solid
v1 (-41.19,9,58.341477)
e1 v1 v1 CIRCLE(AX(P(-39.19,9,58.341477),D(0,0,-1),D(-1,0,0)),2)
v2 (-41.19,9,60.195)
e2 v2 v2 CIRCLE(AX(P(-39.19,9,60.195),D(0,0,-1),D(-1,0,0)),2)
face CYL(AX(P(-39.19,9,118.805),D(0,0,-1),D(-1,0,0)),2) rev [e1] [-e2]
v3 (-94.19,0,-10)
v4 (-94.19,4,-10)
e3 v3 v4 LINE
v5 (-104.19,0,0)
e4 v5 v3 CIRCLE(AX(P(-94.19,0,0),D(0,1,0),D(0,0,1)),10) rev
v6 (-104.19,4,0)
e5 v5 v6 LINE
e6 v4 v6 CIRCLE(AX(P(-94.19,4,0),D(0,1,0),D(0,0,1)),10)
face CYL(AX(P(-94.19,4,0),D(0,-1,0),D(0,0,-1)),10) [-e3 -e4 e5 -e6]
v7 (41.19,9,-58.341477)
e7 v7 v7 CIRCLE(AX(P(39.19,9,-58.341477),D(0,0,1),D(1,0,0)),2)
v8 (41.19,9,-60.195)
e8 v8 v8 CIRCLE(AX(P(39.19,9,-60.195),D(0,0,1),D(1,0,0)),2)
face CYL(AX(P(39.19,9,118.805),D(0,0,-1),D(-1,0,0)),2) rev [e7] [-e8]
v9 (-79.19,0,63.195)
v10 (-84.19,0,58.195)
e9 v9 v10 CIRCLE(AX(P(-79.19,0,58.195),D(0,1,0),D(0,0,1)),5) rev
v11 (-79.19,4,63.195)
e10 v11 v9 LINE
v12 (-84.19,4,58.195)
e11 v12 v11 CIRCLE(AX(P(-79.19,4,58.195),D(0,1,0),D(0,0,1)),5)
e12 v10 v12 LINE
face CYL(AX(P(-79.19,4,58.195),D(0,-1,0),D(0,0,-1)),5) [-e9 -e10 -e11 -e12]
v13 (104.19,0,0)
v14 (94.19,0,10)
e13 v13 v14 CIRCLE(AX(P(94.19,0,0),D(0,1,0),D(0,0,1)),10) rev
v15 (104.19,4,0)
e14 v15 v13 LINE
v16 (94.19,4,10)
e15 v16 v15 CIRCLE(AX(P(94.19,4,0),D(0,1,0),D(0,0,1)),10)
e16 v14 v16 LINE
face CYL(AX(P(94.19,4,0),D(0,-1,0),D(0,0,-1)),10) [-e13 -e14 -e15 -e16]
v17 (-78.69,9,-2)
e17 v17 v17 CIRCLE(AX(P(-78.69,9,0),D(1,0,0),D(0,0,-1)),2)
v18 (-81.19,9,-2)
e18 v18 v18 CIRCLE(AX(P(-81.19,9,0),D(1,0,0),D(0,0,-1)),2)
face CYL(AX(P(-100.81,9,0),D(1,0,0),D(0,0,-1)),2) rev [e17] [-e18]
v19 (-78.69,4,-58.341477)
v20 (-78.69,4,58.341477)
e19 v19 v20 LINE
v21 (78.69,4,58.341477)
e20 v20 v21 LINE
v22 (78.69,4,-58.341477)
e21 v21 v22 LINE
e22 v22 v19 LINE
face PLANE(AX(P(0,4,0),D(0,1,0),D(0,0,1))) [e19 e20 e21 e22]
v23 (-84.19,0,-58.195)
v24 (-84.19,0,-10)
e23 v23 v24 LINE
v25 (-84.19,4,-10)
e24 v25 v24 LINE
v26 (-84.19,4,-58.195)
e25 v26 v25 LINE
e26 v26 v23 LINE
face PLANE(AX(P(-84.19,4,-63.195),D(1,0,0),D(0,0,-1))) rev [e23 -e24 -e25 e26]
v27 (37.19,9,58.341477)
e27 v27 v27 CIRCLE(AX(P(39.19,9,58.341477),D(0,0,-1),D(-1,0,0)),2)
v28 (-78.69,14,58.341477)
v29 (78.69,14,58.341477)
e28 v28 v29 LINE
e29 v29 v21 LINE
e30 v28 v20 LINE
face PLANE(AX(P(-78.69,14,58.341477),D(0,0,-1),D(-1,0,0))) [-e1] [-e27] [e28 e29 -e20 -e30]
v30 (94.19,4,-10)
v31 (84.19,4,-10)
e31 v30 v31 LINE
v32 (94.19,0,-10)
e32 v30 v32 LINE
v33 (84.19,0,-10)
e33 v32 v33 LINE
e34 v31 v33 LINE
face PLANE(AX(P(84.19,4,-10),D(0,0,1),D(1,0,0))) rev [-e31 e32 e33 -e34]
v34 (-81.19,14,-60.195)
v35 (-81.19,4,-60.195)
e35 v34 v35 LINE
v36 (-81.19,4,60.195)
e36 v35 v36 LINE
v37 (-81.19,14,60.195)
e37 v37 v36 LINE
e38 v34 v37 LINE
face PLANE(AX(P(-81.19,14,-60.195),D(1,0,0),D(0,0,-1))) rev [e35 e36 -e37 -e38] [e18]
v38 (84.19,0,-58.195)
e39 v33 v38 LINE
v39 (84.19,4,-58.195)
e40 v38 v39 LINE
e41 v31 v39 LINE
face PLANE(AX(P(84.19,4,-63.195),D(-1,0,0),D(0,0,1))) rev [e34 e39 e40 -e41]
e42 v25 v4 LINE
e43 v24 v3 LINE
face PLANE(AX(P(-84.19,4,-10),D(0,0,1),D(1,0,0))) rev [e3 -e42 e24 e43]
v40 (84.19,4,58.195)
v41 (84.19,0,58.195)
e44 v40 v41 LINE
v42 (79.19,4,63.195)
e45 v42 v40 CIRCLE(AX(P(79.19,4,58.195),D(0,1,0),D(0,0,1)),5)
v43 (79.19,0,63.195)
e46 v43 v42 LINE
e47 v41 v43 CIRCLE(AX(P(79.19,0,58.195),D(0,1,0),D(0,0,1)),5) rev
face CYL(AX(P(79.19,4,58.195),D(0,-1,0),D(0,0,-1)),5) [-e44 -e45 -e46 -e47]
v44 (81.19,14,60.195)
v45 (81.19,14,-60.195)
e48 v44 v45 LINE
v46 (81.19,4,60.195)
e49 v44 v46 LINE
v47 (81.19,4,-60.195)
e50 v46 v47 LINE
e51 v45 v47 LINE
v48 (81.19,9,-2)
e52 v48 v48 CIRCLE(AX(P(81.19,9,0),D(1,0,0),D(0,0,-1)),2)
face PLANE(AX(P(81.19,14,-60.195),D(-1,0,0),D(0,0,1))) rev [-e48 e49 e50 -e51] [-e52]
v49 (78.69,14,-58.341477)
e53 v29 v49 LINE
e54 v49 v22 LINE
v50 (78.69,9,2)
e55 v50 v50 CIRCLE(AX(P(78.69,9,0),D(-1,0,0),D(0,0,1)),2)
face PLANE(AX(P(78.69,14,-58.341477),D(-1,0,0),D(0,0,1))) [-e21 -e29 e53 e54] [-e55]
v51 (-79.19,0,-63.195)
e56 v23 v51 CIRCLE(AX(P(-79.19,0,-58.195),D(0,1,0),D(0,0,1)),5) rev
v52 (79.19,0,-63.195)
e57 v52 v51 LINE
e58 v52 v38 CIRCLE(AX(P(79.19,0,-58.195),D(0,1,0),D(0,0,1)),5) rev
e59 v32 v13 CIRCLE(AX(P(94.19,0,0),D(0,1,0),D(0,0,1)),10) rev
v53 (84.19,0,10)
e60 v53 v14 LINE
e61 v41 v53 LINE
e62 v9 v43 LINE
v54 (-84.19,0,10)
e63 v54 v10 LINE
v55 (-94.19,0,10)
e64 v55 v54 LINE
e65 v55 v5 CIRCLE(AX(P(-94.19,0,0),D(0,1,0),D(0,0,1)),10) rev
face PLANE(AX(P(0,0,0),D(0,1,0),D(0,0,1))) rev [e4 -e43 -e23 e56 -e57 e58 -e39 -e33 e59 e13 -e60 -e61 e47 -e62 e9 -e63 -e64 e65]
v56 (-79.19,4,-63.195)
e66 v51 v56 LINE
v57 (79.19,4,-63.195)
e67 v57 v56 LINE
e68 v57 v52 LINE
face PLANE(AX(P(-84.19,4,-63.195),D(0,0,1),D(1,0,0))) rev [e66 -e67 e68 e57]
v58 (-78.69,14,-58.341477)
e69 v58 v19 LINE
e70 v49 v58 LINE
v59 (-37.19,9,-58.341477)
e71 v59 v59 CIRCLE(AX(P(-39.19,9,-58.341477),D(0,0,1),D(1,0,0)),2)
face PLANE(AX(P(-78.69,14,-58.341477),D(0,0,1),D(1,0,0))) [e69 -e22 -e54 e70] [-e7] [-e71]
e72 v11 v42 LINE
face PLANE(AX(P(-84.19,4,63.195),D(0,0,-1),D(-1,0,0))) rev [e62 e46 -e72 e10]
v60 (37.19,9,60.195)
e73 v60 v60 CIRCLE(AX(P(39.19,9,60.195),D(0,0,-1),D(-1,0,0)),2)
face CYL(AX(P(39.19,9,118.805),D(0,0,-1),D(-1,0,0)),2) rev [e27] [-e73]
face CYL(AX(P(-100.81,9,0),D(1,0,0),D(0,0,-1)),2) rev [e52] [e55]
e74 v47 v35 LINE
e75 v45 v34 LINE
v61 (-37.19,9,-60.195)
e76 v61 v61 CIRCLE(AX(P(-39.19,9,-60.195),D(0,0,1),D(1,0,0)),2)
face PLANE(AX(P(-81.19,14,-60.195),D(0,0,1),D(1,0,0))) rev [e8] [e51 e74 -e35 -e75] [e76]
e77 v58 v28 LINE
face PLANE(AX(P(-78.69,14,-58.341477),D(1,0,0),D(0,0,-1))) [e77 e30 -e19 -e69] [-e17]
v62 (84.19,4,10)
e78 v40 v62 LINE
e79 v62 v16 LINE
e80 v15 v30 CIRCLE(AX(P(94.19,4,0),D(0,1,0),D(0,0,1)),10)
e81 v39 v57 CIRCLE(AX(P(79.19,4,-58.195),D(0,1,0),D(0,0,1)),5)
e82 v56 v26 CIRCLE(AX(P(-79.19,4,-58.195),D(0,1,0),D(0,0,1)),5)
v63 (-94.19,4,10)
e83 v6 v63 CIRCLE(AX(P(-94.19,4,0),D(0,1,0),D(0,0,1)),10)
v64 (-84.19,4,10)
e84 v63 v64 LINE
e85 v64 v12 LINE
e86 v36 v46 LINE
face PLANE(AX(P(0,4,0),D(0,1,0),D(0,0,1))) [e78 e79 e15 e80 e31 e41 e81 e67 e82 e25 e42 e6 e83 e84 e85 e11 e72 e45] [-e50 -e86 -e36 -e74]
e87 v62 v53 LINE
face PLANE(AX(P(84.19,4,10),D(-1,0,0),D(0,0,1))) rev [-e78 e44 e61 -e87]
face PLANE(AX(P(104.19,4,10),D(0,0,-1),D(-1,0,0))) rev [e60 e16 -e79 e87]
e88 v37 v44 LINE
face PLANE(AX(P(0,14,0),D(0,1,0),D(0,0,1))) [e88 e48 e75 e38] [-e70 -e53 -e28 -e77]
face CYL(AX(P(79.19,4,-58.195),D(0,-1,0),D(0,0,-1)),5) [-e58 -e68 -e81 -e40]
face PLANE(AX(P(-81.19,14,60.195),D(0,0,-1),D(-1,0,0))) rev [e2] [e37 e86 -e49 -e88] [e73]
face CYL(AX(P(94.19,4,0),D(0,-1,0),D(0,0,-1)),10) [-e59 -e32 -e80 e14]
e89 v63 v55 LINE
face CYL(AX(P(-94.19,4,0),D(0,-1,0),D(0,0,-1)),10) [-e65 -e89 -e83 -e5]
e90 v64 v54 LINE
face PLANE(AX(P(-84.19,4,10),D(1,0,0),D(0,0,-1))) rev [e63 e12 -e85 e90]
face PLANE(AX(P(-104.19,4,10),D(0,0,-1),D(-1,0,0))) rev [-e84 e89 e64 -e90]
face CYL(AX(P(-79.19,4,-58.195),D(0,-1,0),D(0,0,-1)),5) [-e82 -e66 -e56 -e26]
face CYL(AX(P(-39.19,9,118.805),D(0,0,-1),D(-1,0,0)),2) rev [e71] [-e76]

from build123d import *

# Parameters (mm, degrees)
BOSS_EXTRUDE1_DEPTH = 4
SKETCH2_W           = 162.38
SKETCH2_H           = 120.39
SKETCH2_W_2         = 157.38
SKETCH2_H_2         = 116.682954798
BOSS_EXTRUDE2_DEPTH = 10
FILLET1_R           = 10
FILLET2_R           = 5
SKETCH3_R           = 2
CUT_EXTRUDE1_DEPTH  = 182
SKETCH4_R           = 2
CUT_EXTRUDE2_DEPTH  = 182


with BuildPart() as part:
    # Sketch1 → Boss-Extrude1 (new body)
    with BuildSketch(Plane(origin=(0, 0, 0), x_dir=(1, 0, 0), z_dir=(0, 1, 0))):
        Polygon((-84.19, 63.195), (84.19, 63.195), (84.19, 10), (104.19, 10), (104.19, -10), (84.19, -10), (84.19, -63.195), (-84.19, -63.195), (-84.19, -10), (-104.19, -10), (-104.19, 10), (-84.19, 10), align=None)
    extrude(amount=BOSS_EXTRUDE1_DEPTH)

    # Sketch2 → Boss-Extrude2 (add)
    with BuildSketch(Plane(origin=(0, 4, 0), x_dir=(1, 0, 0), z_dir=(0, 1, 0))):
        Rectangle(SKETCH2_W, SKETCH2_H)
        Rectangle(SKETCH2_W_2, SKETCH2_H_2, mode=Mode.SUBTRACT)
    extrude(amount=BOSS_EXTRUDE2_DEPTH)

    # Fillet1
    fillet1_edges = [part.edges().sort_by_distance(p)[0] for p in [
        (104.19, 2, -10),
        (104.19, 2, 10),
        (-104.19, 2, -10),
        (-104.19, 2, 10),
    ]]
    fillet(fillet1_edges, radius=FILLET1_R - 0.0001)  # a hair under: the kernel refuses the full size

    # Fillet2
    fillet2_edges = [part.edges().sort_by_distance(p)[0] for p in [
        (84.19, 2, 63.195),
        (-84.19, 2, 63.195),
        (-84.19, 2, -63.195),
        (84.19, 2, -63.195),
    ]]
    fillet(fillet2_edges, radius=FILLET2_R)

    # Sketch3 → Cut-Extrude1 (cut)
    with BuildSketch(Plane(origin=(81.19, 0, 0), x_dir=(0, 0, -1), z_dir=(1, 0, 0))):
        with Locations((0, 9)):
            Circle(SKETCH3_R)
    extrude(amount=-CUT_EXTRUDE1_DEPTH, mode=Mode.SUBTRACT)

    # Sketch4 → Cut-Extrude2 (cut)
    with BuildSketch(Plane(origin=(0, 0, -63.195), x_dir=(-1, 0, 0), z_dir=(0, 0, -1))):
        with Locations((39.19, 9)):
            Circle(SKETCH4_R)
        with Locations((-39.19, 9)):
            Circle(SKETCH4_R)
    extrude(amount=-CUT_EXTRUDE2_DEPTH, mode=Mode.SUBTRACT)


solid = part.part
